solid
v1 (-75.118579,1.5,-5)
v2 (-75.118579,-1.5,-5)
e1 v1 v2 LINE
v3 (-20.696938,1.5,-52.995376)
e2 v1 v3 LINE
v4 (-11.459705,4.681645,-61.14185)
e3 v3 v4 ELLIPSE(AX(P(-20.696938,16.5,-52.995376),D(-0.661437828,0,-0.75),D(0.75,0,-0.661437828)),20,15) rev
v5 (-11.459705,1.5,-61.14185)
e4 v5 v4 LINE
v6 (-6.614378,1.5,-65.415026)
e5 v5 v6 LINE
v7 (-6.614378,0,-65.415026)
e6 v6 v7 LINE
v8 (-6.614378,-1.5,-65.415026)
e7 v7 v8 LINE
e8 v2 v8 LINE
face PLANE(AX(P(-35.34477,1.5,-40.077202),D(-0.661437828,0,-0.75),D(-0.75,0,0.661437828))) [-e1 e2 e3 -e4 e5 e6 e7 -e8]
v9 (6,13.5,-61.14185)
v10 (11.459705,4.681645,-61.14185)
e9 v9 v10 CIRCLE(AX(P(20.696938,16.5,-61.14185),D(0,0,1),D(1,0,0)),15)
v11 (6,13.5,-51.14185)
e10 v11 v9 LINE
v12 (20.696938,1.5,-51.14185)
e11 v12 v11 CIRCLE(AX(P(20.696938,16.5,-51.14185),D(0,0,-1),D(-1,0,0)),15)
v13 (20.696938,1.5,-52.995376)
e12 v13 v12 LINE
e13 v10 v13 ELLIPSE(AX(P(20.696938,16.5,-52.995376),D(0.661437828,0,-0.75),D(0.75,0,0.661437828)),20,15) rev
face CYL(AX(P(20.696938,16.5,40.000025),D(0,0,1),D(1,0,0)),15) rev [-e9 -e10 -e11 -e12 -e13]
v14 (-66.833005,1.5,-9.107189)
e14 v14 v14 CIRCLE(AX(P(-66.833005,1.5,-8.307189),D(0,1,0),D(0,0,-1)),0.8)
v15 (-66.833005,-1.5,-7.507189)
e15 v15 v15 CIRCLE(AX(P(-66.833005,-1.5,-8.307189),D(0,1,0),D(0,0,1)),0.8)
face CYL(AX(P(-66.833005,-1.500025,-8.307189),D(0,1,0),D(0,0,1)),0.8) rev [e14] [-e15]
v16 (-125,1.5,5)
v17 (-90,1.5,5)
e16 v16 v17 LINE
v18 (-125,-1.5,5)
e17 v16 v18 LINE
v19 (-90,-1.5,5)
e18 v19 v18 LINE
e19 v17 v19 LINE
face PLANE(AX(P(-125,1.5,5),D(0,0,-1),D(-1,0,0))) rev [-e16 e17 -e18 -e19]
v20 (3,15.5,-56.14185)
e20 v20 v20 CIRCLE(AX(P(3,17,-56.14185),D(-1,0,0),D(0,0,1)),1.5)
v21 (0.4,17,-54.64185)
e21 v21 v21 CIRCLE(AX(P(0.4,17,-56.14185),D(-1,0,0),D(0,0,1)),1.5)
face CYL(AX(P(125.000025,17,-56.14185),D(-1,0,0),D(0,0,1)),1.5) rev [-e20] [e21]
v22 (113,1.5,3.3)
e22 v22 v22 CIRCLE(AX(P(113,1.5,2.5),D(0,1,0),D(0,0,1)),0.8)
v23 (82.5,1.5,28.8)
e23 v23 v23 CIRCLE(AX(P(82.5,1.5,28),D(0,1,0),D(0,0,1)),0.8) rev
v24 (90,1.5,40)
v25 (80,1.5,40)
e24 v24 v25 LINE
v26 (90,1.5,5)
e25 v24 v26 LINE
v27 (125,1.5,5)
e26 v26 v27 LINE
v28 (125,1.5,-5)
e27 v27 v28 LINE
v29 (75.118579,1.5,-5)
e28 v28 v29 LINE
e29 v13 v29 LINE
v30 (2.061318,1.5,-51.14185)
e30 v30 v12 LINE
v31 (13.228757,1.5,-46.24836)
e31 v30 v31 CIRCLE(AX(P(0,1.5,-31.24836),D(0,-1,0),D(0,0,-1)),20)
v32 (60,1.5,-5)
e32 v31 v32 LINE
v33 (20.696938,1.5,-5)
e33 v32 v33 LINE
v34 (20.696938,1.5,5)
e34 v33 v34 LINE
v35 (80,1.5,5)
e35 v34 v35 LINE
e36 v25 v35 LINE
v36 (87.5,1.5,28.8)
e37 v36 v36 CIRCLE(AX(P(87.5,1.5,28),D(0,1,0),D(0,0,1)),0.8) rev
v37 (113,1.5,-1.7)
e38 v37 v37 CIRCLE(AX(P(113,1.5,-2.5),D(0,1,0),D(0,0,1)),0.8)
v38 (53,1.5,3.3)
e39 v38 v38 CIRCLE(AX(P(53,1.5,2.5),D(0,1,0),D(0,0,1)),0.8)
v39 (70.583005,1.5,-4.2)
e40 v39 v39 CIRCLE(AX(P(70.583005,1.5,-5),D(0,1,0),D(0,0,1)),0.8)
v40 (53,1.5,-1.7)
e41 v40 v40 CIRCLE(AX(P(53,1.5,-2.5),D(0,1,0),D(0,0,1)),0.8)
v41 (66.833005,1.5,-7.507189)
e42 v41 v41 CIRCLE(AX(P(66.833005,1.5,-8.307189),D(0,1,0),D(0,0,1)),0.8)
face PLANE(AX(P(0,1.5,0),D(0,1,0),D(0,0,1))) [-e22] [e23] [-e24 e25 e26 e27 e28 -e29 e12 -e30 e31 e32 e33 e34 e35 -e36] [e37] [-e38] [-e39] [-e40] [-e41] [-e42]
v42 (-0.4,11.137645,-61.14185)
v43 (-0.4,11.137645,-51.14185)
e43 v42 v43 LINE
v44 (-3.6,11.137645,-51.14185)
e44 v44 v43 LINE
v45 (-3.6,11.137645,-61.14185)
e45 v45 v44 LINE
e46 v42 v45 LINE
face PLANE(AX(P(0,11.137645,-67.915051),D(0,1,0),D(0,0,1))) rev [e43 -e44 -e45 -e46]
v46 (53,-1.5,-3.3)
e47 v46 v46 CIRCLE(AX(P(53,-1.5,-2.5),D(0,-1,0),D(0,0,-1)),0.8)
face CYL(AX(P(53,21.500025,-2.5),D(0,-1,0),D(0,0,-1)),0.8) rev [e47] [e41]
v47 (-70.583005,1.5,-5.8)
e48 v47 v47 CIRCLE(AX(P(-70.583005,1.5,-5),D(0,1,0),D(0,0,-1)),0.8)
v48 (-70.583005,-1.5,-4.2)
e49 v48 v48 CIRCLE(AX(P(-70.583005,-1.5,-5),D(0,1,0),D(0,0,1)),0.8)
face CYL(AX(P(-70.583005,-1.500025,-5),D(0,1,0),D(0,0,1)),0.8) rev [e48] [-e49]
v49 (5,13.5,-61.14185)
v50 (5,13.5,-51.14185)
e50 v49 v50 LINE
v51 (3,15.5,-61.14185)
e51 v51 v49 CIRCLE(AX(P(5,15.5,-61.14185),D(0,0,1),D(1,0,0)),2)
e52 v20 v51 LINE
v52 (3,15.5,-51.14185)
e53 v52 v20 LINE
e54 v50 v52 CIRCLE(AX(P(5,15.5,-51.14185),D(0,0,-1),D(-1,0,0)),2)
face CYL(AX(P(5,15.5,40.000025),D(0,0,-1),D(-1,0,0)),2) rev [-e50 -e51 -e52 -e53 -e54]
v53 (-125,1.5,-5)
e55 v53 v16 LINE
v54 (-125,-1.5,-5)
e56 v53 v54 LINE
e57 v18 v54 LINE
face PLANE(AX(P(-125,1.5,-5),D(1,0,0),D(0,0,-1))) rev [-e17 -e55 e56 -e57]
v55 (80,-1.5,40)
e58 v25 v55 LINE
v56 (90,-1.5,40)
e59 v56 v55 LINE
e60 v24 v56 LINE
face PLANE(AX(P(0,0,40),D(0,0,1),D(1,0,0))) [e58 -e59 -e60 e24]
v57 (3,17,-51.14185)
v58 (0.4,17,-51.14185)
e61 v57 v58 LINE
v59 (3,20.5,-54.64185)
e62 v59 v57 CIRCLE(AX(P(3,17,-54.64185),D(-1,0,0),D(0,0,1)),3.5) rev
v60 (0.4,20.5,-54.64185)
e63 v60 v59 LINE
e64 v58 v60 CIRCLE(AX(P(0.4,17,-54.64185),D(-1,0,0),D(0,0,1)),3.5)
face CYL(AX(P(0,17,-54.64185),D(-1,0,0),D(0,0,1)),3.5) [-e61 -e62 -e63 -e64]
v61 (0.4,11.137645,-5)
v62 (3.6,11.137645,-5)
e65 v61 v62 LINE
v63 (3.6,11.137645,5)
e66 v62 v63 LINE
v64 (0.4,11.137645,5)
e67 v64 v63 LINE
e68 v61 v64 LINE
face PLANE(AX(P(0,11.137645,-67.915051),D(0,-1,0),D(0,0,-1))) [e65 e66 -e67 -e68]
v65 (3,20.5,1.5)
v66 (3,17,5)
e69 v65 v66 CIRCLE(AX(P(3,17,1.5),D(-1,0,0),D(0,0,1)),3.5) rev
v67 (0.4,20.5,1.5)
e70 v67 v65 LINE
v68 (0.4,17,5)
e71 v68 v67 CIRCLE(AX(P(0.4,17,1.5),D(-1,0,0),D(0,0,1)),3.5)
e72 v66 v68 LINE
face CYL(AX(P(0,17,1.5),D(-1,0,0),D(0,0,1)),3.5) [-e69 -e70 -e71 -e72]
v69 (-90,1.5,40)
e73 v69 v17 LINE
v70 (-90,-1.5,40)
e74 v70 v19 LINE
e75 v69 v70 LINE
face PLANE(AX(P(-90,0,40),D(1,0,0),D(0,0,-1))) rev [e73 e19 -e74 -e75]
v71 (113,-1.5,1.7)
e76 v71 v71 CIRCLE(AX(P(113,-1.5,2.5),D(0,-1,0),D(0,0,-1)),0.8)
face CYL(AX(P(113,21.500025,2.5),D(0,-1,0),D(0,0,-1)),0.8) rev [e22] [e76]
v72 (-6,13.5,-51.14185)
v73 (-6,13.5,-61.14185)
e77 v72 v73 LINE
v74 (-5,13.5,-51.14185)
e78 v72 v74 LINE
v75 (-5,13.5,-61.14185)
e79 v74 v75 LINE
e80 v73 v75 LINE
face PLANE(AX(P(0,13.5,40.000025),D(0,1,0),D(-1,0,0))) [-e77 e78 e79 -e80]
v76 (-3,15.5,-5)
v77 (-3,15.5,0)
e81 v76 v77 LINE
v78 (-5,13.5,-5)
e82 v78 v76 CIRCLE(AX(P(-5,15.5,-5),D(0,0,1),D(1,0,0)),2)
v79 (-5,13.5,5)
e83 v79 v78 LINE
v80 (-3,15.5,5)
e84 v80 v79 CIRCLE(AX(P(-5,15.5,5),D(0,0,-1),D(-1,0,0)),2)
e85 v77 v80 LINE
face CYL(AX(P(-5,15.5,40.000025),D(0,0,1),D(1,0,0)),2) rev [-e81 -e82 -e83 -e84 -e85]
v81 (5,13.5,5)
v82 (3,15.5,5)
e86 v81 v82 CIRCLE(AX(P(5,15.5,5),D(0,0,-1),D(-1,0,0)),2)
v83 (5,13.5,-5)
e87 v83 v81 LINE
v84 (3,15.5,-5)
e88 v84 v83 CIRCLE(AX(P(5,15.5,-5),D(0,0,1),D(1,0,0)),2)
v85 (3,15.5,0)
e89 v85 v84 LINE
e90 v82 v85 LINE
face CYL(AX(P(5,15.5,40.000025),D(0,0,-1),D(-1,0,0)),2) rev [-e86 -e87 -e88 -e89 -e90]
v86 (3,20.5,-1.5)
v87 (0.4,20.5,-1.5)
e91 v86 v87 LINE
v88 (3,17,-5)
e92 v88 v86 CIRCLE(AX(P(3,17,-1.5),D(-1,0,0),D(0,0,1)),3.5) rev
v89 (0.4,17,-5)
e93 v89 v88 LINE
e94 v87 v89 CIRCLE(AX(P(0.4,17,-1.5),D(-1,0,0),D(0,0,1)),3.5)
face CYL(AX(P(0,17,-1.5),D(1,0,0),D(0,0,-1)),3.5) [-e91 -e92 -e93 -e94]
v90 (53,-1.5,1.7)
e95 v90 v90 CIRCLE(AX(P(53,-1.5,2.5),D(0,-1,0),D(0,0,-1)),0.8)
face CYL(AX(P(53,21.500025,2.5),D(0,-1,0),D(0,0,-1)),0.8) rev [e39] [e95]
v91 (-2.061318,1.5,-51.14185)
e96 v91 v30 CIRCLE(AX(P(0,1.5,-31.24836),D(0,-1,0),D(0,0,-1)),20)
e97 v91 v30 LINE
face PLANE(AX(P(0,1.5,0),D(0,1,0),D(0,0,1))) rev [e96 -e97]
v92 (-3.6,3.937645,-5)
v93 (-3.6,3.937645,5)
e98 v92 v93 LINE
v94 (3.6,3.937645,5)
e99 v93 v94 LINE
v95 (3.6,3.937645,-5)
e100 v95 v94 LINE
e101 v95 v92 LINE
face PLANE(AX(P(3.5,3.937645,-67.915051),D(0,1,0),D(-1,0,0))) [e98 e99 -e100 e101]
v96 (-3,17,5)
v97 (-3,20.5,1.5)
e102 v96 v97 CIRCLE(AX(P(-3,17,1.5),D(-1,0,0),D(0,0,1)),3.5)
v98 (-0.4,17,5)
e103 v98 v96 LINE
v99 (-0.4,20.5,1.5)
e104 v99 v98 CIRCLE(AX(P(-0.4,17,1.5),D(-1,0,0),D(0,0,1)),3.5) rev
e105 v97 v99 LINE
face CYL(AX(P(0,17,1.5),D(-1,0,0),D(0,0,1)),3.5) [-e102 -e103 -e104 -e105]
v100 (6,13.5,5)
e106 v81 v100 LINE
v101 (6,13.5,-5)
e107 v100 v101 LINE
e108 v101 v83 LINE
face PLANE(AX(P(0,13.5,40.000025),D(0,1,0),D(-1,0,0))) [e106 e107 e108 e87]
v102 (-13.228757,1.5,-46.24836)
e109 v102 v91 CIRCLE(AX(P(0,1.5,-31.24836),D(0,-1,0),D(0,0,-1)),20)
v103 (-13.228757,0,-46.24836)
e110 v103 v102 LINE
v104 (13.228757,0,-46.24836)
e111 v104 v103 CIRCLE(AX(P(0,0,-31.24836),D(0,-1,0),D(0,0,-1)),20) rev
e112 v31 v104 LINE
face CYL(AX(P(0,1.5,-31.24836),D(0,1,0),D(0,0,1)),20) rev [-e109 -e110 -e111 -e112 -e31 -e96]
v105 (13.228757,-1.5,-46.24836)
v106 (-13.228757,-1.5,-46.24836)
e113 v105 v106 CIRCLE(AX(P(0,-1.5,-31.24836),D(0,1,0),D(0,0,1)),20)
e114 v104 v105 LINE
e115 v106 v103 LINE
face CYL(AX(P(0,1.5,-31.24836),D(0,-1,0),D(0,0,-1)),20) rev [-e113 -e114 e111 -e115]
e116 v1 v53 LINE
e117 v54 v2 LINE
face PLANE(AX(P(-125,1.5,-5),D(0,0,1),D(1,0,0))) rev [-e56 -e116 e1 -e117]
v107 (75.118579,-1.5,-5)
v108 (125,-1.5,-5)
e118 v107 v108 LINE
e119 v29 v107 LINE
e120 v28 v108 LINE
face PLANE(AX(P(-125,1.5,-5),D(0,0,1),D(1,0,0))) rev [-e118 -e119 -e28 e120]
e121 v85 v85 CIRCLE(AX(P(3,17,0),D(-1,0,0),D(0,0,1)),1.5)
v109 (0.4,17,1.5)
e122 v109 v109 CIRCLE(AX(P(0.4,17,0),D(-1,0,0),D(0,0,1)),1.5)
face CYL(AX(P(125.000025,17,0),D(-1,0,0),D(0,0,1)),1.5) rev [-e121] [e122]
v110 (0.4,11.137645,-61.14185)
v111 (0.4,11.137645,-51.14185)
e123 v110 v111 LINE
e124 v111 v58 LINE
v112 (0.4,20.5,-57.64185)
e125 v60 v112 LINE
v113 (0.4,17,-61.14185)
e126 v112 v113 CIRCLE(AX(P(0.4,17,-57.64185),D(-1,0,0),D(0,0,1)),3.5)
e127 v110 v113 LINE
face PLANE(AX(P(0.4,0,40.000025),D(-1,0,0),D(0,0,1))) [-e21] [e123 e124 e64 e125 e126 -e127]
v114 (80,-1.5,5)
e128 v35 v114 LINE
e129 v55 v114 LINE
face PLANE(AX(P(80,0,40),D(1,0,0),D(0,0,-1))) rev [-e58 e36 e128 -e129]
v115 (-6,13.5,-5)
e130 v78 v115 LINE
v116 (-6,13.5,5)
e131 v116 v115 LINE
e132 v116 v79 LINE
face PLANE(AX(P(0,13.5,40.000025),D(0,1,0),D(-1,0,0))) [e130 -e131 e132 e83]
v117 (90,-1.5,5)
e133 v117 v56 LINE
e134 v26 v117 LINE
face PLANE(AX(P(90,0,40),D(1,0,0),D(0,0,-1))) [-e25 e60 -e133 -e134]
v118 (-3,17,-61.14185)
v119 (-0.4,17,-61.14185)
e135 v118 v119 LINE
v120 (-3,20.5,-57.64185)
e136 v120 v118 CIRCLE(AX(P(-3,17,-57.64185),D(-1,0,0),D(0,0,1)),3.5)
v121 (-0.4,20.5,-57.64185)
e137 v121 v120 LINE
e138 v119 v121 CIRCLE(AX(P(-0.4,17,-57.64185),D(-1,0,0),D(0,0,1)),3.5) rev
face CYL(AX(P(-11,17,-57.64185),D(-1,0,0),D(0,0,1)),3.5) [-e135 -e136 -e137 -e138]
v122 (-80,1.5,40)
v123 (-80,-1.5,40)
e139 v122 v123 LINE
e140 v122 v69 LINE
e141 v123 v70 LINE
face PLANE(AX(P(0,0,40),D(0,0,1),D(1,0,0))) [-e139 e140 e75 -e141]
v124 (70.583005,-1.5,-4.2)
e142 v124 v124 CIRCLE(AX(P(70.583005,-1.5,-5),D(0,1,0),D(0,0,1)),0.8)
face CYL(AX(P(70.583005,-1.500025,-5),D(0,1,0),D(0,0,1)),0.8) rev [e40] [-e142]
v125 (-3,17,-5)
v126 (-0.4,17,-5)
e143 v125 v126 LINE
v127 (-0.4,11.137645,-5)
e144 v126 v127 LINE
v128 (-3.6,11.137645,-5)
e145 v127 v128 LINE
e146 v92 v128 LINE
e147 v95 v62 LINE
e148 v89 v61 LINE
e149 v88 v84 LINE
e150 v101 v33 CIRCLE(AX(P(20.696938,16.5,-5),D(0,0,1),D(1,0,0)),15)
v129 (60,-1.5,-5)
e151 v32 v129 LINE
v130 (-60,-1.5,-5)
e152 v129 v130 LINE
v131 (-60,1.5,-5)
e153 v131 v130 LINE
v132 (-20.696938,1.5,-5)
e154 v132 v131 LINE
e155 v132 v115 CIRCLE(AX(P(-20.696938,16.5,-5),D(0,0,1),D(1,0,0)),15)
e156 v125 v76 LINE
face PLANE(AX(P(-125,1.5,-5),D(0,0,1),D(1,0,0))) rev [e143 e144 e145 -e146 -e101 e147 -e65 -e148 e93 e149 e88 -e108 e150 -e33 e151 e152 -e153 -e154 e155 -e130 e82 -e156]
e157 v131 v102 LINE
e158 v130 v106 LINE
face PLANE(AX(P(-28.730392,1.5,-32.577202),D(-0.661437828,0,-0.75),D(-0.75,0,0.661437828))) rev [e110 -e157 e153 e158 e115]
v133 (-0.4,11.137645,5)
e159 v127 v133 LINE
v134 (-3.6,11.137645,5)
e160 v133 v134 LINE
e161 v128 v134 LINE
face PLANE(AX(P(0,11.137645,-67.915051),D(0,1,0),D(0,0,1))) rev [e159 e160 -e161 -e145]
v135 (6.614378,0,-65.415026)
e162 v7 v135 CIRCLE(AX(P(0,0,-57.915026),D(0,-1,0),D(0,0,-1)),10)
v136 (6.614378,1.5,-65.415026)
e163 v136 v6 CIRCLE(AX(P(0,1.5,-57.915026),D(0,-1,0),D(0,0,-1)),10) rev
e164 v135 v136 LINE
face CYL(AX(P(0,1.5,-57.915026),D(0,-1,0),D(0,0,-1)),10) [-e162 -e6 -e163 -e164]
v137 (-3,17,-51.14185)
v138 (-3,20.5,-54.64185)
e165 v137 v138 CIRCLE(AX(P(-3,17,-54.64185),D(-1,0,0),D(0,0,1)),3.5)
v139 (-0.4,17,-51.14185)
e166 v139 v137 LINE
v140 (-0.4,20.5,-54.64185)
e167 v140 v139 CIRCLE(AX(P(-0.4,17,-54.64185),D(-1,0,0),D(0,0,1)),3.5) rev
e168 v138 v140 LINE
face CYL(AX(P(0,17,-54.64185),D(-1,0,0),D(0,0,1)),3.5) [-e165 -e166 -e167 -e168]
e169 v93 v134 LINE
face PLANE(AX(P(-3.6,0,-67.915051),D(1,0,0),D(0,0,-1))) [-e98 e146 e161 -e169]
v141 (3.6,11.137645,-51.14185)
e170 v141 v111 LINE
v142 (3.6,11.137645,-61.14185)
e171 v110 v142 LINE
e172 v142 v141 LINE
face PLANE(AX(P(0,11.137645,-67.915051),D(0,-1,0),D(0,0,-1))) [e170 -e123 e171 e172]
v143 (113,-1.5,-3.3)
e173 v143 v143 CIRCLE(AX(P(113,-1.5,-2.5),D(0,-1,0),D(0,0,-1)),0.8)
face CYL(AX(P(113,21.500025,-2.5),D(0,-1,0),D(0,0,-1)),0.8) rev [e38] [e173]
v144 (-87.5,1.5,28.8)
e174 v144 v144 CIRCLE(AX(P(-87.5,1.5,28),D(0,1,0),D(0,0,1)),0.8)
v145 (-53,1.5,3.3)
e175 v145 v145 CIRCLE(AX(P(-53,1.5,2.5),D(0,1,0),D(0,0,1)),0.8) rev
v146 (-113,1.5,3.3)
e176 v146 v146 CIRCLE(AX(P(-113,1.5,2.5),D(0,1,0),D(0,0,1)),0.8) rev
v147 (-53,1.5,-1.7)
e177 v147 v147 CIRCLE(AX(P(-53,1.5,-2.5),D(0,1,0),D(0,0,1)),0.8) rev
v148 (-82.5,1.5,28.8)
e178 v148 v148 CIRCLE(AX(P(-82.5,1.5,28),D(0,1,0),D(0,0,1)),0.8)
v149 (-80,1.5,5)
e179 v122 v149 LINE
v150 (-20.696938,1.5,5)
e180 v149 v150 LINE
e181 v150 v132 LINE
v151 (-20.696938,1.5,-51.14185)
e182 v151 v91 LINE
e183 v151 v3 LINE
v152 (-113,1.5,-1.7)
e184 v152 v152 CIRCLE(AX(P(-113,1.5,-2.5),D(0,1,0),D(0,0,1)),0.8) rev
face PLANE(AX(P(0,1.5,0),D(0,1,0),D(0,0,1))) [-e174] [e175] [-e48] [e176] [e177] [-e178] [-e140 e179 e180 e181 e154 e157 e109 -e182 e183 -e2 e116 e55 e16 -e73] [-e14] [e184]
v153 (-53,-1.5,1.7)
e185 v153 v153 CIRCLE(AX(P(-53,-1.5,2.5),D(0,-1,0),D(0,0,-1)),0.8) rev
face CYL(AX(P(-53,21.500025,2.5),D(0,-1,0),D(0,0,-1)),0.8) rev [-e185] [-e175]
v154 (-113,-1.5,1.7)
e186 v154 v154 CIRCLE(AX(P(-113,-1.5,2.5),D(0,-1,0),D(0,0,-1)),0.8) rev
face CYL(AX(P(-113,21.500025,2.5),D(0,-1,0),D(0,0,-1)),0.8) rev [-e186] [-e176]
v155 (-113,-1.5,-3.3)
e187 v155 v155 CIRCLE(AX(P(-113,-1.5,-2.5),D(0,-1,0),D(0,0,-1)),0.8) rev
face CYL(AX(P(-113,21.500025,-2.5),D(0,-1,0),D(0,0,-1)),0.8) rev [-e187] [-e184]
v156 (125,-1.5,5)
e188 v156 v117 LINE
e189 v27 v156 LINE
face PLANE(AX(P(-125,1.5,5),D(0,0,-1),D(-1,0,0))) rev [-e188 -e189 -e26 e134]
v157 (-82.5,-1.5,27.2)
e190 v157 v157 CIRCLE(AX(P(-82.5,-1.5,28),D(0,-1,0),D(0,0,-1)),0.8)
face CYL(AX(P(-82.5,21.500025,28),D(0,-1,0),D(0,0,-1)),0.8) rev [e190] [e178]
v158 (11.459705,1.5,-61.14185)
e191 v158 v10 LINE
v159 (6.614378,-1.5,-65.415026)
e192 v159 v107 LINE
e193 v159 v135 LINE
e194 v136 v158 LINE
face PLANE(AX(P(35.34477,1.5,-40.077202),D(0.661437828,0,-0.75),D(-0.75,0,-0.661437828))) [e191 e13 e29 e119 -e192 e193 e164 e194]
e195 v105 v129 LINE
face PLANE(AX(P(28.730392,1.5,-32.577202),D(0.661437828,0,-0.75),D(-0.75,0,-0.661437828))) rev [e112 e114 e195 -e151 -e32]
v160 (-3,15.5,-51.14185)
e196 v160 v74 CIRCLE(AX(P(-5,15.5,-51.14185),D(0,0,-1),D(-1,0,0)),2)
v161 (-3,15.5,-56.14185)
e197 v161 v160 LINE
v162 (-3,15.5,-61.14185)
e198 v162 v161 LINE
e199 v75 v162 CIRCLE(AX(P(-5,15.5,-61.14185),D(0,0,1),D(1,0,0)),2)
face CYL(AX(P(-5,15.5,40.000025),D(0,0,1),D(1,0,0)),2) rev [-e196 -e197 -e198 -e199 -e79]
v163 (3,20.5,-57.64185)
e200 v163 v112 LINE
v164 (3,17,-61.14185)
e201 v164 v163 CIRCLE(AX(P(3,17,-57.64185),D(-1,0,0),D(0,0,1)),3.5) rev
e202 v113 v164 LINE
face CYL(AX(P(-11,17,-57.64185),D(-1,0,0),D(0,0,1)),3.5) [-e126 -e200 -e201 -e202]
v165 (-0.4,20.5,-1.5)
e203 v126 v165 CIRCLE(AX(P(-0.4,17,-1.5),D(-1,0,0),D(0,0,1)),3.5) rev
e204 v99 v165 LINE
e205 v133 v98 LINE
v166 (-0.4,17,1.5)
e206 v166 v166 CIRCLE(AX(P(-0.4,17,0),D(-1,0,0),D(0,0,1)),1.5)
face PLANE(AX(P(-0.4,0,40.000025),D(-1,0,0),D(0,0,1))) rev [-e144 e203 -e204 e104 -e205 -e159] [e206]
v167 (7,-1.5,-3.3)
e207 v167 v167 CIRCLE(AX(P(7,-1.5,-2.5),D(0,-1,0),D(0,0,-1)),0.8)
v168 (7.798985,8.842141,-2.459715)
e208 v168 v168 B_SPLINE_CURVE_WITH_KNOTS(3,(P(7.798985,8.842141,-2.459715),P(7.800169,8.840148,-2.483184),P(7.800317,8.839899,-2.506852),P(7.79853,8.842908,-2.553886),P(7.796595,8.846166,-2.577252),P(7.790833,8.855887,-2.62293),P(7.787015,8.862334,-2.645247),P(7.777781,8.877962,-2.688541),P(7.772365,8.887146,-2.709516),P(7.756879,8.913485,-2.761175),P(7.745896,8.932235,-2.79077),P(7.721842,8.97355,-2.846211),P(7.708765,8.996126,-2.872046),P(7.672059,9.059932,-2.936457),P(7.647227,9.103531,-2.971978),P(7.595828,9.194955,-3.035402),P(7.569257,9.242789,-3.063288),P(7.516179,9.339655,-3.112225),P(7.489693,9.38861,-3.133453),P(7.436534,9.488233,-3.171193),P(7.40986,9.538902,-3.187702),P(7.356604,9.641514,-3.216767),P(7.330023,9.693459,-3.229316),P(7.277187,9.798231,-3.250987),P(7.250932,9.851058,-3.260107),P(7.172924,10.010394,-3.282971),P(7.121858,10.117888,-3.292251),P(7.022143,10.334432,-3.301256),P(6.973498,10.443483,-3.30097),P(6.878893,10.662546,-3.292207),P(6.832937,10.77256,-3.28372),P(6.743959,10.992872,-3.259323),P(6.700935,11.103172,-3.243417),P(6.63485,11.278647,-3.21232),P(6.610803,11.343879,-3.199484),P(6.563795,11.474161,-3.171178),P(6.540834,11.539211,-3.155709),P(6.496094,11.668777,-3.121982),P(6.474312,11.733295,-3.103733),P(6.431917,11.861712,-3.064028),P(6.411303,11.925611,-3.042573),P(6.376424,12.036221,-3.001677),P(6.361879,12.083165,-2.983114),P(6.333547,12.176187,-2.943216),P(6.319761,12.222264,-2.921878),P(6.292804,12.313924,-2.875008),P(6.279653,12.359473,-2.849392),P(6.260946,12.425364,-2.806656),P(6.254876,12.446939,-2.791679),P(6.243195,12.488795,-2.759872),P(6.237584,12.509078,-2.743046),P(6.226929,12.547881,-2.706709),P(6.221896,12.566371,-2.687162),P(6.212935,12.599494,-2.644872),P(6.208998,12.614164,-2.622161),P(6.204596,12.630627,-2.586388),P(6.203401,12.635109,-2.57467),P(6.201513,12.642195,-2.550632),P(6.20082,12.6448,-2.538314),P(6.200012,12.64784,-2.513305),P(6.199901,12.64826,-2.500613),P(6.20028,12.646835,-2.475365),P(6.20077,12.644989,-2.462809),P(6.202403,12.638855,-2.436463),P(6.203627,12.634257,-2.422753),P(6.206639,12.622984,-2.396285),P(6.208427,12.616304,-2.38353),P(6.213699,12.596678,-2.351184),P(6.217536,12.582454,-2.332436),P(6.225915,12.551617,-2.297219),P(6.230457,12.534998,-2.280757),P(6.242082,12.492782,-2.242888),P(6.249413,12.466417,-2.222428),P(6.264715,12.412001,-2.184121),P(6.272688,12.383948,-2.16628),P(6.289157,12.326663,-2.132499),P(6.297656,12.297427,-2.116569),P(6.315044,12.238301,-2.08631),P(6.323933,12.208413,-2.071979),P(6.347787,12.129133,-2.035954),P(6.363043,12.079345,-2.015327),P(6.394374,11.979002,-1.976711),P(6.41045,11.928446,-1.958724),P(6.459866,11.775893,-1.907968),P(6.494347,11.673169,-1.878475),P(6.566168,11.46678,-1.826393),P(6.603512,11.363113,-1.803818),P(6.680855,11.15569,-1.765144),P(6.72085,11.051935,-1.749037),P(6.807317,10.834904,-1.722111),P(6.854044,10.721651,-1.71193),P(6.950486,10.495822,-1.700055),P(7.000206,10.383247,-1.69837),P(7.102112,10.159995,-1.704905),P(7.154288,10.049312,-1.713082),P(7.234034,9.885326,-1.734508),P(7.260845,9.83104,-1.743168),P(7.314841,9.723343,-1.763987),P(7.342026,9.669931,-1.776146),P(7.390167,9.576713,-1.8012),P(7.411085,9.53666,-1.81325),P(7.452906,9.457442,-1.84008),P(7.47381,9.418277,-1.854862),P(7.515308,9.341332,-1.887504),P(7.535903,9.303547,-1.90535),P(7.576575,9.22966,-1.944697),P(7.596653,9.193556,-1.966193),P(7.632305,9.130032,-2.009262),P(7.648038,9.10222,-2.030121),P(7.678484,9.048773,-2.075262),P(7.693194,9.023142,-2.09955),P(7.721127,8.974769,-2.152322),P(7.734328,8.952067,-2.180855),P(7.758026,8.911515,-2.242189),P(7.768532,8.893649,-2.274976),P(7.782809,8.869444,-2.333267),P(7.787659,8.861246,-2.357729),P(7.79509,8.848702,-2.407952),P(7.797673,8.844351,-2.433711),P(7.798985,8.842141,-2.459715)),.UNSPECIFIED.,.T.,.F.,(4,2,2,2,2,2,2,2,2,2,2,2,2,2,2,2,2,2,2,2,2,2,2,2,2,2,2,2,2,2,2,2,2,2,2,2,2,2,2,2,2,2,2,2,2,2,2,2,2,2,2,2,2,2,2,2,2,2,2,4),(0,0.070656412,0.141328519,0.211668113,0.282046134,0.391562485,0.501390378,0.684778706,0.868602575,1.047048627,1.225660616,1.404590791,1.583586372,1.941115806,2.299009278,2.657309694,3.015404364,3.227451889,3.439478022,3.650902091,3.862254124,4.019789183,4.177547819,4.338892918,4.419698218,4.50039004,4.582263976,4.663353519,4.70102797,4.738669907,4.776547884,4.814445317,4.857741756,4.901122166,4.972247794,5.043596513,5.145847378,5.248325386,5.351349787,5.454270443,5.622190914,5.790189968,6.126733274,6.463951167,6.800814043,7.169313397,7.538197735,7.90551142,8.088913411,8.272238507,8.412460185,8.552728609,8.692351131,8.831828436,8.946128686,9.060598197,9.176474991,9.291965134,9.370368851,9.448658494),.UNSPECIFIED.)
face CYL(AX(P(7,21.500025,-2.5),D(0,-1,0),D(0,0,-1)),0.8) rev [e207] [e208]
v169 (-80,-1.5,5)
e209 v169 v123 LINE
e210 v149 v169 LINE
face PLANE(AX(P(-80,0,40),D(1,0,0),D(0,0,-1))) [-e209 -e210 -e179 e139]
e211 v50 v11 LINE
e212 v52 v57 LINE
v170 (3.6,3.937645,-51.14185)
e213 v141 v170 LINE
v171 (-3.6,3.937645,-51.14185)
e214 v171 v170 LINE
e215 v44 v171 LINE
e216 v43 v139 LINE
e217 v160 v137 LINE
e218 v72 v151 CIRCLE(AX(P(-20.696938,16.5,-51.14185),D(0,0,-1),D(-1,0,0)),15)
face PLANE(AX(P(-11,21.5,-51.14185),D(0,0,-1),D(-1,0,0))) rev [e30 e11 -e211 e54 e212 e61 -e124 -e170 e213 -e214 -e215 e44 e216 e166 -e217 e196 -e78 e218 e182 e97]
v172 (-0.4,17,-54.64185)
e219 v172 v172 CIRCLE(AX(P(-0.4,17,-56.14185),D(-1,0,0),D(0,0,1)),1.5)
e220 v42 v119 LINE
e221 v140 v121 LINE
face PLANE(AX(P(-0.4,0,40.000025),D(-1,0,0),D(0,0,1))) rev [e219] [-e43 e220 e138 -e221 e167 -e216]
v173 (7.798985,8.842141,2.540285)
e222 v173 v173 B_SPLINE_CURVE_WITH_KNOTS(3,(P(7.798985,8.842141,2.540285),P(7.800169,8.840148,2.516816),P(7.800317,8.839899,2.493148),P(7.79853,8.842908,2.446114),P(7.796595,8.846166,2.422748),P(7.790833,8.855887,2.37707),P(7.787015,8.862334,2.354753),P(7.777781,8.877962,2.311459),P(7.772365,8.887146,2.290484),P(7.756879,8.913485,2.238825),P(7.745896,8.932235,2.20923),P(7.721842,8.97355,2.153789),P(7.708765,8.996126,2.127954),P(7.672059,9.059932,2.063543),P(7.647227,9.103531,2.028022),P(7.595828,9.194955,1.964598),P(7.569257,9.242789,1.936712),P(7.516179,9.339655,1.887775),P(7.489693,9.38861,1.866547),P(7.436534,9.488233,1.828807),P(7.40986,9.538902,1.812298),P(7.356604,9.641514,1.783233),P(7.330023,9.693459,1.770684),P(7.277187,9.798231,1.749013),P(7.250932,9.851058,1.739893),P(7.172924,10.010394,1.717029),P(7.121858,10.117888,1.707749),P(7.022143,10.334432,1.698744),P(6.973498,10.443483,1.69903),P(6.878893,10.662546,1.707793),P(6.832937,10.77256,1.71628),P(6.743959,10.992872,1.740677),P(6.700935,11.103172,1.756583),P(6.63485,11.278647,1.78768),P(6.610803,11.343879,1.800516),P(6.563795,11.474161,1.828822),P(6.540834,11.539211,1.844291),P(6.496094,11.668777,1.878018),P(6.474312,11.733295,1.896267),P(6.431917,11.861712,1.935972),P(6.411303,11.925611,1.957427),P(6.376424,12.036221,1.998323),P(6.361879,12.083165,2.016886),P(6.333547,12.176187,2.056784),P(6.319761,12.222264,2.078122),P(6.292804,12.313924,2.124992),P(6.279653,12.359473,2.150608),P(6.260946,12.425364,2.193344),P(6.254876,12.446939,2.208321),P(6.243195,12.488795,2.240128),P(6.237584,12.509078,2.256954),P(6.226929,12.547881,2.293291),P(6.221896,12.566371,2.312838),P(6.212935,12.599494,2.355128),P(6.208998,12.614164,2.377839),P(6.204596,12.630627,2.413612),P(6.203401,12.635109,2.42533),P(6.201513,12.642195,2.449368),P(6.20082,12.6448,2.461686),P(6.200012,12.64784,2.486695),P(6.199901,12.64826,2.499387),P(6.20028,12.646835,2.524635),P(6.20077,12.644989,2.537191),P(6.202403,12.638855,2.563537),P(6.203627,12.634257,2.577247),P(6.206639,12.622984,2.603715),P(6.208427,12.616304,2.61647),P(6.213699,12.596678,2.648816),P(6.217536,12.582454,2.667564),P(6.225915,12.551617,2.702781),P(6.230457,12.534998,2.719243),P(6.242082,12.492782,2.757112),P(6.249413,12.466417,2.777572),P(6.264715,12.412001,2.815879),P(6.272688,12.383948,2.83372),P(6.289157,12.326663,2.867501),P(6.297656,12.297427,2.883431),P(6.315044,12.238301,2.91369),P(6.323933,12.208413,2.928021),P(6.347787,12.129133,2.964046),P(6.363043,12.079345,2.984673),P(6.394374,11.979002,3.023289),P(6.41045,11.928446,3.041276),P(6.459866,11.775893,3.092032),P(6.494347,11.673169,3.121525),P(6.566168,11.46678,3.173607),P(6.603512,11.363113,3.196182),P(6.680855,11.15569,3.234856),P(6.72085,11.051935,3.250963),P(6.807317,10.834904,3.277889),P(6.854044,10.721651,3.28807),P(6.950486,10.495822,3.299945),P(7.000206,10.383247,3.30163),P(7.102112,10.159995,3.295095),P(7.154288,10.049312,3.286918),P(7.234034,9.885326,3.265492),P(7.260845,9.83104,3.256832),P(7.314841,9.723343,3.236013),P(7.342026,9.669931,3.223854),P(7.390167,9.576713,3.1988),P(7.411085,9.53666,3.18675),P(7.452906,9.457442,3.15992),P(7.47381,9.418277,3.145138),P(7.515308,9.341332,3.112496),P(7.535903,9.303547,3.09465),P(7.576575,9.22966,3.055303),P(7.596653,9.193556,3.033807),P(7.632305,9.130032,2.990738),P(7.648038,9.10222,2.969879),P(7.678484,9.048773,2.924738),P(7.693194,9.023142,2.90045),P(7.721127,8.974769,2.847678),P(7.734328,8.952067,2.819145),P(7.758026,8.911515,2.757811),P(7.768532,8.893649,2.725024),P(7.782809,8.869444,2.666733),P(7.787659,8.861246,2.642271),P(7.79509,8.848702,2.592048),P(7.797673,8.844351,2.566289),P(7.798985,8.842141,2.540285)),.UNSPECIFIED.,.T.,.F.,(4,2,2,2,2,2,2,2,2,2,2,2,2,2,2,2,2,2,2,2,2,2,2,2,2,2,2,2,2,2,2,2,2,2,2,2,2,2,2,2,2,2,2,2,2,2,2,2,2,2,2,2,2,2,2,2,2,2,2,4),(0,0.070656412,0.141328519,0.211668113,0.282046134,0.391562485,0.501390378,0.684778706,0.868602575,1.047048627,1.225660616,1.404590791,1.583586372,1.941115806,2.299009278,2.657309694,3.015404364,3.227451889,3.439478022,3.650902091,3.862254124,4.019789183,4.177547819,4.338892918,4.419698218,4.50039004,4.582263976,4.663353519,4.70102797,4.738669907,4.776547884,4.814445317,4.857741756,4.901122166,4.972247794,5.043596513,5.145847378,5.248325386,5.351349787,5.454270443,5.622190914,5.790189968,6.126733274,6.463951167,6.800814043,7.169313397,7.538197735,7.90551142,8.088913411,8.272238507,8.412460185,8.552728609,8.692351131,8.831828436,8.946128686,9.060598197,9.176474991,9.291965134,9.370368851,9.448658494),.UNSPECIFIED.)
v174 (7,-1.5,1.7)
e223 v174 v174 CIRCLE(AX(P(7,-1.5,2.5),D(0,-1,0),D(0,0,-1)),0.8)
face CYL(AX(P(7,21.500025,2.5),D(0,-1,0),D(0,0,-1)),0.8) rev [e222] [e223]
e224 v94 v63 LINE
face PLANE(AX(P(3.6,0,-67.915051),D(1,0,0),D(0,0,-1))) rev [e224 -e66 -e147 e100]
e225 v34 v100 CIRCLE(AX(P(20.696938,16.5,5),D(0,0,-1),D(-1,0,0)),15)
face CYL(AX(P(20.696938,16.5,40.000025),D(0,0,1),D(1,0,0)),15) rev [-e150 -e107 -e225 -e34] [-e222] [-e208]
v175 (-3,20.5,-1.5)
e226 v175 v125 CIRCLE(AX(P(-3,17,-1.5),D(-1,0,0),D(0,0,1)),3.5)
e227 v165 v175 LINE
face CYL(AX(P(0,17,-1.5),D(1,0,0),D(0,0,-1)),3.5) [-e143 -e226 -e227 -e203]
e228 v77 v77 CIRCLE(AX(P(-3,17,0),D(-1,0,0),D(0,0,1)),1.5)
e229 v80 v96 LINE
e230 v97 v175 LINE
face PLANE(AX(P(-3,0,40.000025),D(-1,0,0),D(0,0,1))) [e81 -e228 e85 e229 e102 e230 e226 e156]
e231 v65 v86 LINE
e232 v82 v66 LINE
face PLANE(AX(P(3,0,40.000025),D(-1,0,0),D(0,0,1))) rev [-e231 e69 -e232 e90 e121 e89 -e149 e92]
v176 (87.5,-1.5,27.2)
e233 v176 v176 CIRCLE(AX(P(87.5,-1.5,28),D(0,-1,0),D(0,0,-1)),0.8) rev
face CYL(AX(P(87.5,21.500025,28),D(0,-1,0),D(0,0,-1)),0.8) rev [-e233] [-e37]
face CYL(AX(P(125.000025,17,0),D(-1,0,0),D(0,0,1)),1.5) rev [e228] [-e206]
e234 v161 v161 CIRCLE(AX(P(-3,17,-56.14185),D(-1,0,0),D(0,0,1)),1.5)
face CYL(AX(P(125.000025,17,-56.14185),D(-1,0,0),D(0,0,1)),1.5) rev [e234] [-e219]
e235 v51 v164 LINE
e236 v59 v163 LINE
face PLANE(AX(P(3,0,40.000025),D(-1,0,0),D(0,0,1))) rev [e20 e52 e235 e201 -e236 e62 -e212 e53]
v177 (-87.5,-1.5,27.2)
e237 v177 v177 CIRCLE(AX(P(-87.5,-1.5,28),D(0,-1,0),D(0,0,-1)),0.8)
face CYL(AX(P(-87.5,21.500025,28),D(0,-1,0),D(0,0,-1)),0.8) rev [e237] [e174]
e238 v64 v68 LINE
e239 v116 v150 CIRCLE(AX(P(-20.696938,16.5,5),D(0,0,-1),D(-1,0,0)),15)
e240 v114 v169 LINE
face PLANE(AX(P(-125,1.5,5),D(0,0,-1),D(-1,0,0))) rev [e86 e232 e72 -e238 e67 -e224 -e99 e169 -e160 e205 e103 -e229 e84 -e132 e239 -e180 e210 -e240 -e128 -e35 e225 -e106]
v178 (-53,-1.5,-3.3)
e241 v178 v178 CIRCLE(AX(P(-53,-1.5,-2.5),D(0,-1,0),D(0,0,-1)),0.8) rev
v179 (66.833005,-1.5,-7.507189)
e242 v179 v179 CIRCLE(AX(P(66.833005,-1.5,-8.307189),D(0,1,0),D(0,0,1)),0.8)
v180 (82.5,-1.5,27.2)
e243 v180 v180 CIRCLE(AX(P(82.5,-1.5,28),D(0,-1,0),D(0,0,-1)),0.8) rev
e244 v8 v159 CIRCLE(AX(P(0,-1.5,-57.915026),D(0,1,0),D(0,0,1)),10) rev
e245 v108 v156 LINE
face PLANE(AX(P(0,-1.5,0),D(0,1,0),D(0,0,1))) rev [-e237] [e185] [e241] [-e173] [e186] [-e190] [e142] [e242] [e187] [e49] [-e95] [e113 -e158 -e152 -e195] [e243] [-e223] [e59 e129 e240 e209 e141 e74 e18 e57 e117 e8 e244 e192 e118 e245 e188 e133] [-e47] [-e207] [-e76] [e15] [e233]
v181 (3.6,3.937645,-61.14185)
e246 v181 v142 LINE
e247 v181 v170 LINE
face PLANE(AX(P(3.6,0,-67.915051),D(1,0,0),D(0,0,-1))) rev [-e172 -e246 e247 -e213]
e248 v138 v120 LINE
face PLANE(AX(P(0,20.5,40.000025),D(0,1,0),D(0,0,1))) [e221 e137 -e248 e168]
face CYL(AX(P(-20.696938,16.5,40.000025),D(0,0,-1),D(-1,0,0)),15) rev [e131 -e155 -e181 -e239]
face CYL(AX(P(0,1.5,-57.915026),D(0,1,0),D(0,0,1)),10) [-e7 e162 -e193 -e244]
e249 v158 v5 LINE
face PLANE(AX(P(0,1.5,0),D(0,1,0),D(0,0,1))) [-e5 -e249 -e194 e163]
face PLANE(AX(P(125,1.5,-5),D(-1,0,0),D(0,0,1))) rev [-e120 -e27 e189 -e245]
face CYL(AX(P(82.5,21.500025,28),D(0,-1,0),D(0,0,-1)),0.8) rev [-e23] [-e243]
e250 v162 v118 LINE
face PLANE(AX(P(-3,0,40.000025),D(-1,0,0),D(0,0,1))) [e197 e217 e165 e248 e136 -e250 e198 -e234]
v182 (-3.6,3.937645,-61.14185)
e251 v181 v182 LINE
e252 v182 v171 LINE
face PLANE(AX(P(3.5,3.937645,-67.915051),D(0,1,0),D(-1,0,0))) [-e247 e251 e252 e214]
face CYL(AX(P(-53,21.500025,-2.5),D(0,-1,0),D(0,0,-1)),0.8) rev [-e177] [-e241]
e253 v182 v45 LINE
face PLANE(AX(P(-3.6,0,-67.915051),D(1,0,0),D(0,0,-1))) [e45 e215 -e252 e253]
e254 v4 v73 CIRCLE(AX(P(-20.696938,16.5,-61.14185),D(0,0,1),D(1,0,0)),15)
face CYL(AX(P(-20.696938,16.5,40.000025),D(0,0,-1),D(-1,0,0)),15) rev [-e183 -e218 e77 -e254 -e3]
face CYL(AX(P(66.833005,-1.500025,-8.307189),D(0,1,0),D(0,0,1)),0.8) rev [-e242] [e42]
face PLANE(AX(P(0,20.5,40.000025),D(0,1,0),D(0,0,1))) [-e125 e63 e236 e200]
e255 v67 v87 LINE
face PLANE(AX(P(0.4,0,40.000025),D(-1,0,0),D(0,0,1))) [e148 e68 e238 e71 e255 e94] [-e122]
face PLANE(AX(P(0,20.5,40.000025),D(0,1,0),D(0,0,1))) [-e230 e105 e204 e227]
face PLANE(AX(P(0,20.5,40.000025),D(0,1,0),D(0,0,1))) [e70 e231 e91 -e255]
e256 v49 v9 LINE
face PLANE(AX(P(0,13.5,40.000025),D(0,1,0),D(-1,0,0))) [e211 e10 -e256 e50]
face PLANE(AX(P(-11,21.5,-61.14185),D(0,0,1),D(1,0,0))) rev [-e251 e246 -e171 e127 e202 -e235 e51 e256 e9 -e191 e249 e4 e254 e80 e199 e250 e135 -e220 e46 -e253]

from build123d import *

# Parameters (mm, degrees)
EXTRUDE_1_DEPTH      = 1.5
EXTRUDE_10_DEPTH     = 1.5
FILLET_1_R           = 10
FILLET_2_R           = 20
EXTRUDE_11_DEPTH     = 20
EXTRUDE_13_DEPTH     = 35
EXTRUDE_14_DEPTH     = 35
EXTRUDE_15_DEPTH     = 1.5
FILLET_5_R           = 20
FILLET_6_R           = 10
SKETCH_58_R          = 0.8000000000000042
SKETCH_58_R_2        = 0.8000000000000055
SKETCH_58_R_3        = 0.8000000000000044
SKETCH_58_R_4        = 0.7999999999999963
SKETCH_58_R_5        = 0.8000000000000119
SKETCH_58_R_6        = 0.7999999999999946
SKETCH_58_R_7        = 0.7999999999999954
SKETCH_58_R_8        = 0.7999999999999948
SKETCH_58_R_9        = 0.8000000000000026
CUT_EXTRUDE_52_DEPTH = 145.10569310974057
SKETCH_26_W          = 22
SKETCH_26_H          = 10
EXTRUDE_16_DEPTH     = 20
CUT_EXTRUDE_53_DEPTH = 163.22491745731594
FILLET_7_R           = 15
FILLET_8_R           = 15
FILLET_9_R           = 3.5
SKETCH_60_R          = 1.5000000000000042
CUT_EXTRUDE_54_DEPTH = 147.3444593643323
SKETCH_61_R          = 1.5000000000000004
CUT_EXTRUDE_55_DEPTH = 147.3444593643323
FILLET_10_R          = 2
SKETCH_63_R          = 0.7999999999999954
CUT_EXTRUDE_56_DEPTH = 144.52160390212592
CUT_EXTRUDE_57_DEPTH = 147.15693979025303


# Some blends are built 0.0001 mm under size
with BuildPart() as part:
    # 草图1 → 凸台-拉伸1 (new body)
    with BuildSketch(Plane(origin=(0, 0, 0), x_dir=(1, 0, 0), z_dir=(0, 1, 0))):
        Polygon((-125, 4.999999999999984), (124.99999999999996, 4.999999999999984), (124.99999999999996, -5.0000000000000115), (-125.00000000000003, -5.0000000000000115), align=None)
    extrude(amount=EXTRUDE_1_DEPTH)



with BuildPart() as body_2:
    # 草图22 → 凸台-拉伸10 (new body)
    with BuildSketch(Plane.XZ):
        Polygon((-3.09e-14, -71.24835955462486), (-3.362e-14, -57.91502622129154), (-60.00000000000021, -4.9999999999999805), (-75.11857892036937, -4.9999999999999805), align=None)
        Polygon((60.00000000000021, -4.9999999999999645), (1.388e-14, -57.91502622129154), (-3.09e-14, -71.24835955462486), (75.1185789203694, -4.999999999999957), align=None)
    extrude(amount=-EXTRUDE_10_DEPTH)

    # 圆角1
    fillet_1_edges = [body_2.edges().sort_by_distance(p)[0] for p in [
        (-8.35e-15, 0.75, -71.24835955462484),
    ]]
    fillet(fillet_1_edges, radius=FILLET_1_R)

    # 圆角2
    fillet_2_edges = [body_2.edges().sort_by_distance(p)[0] for p in [
        (-9.71e-15, 0.75, -57.91502622129154),
    ]]
    fillet(fillet_2_edges, radius=FILLET_2_R)


with BuildPart() as part_1:
    add(part.part)

    add(body_2.part)  # 凸台-拉伸11 merges body 2
    # 草图24 → 凸台-拉伸11 (add)
    with BuildSketch(Plane(origin=(0, 1.5, 0), x_dir=(1, 0, 0), z_dir=(0, 1, 0))):
        Polygon((-10.000000000000004, 4.999999999999999), (9.999999999999996, 4.999999999999999), (9.999999999999996, -5.000000000000001), (-10.000000000000002, -5.000000000000001), align=None)
    extrude(amount=EXTRUDE_11_DEPTH)

    # 草图41 → 凸台-拉伸13 (add)
    with BuildSketch(Plane.XY.offset(5.0000000000000115)):
        Polygon((89.99999999999996, 1.4999999999999951), (79.99999999999996, 1.4999999999999951), (79.99999999999996, -4.88e-15), (89.99999999999996, -4.99e-15), (89.99999999999996, 0.7499999999999958), align=None)
    extrude(amount=EXTRUDE_13_DEPTH)

    # 草图42 → 凸台-拉伸14 (add)
    with BuildSketch(Plane.XY.offset(5.0000000000000115)):
        Polygon((-80, 1.4999999999999998), (-90, 1.4999999999999998), (-90, 0.75), (-90, -2.2e-16), (-80, -2.2e-16), align=None)
    extrude(amount=EXTRUDE_14_DEPTH)

    # 草图57 → 凸台-拉伸15 (add)
    with BuildSketch(Plane(origin=(0, 0, 0), x_dir=(-1, 0, 0), z_dir=(0, -1, 0))):
        Polygon((125.00000000000003, -5.0000000000000115), (90, -5.0000000000000115), (90, -40.000000000000014), (80, -40.000000000000014), (80, -5.0000000000000115), (-79.99999999999996, -5.0000000000000115), (-79.99999999999996, -40.000000000000014), (-89.99999999999996, -40.000000000000014), (-89.99999999999994, -5.0000000000000115), (-124.99999999999996, -5.0000000000000115), (-124.99999999999996, 4.999999999999984), (-75.11857892036936, 4.999999999999984), (-6.614378277661482, 65.41502622129155), (-3.024e-14, 71.24835955462483), (6.614378277661415, 65.41502622129157), (75.11857892036936, 4.999999999999984), (125, 4.999999999999984), align=None)
        Polygon((60.00000000000022, 4.999999999999984), (-60.00000000000011, 4.999999999999984), (-2.082e-14, 57.915026221291534), align=None, mode=Mode.SUBTRACT)
    extrude(amount=EXTRUDE_15_DEPTH)

    # 圆角5
    fillet_5_edges = [part_1.edges().sort_by_distance(p)[0] for p in [
        (2.082e-14, -0.75, -57.915026221291534),
    ]]
    fillet(fillet_5_edges, radius=FILLET_5_R)

    # 圆角6
    fillet_6_edges = [part_1.edges().sort_by_distance(p)[0] for p in [
        (3.024e-14, -0.75, -71.24835955462483),
    ]]
    fillet(fillet_6_edges, radius=FILLET_6_R)

    # 草图58 → 切除-拉伸52 (cut, through all)
    with BuildSketch(Plane.XZ.offset(1.5)):
        with Locations(Location((7, 2.499999999999986, 0), (0, 0, 270))):
            Circle(SKETCH_58_R)
        with Locations(Location((6.999999999999998, -2.5000000000000147, 0), (0, 0, 270))):
            Circle(SKETCH_58_R_2)
        with Locations(Location((53, 2.5000000000000027, 0), (0, 0, 270))):
            Circle(SKETCH_58_R_3)
        with Locations(Location((53.000000000000014, -2.5000000000000027, 0), (0, 0, 270))):
            Circle(SKETCH_58_R_4)
        with Locations(Location((112.99999999999994, 2.5000000000000138, 0), (0, 0, 270))):
            Circle(SKETCH_58_R_5)
        with Locations(Location((112.99999999999997, -2.500000000000007, 0), (0, 0, 270))):
            Circle(SKETCH_58_R_6)
        with Locations(Location((-87.5, 28.000000000000014, 0), (0, 0, 270))):
            Circle(SKETCH_58_R_7)
        with Locations(Location((-82.49999999999999, 28.000000000000007, 0), (0, 0, 270))):
            Circle(SKETCH_58_R_8)
        with Locations(Location((-112.99999999999996, -2.5, 0), (0, 0, 270))):
            Circle(SKETCH_58_R_7)
        with Locations(Location((-112.99999999999996, 2.4999999999999987, 0), (0, 0, 270))):
            Circle(SKETCH_58_R_7)
        with Locations(Location((-53, -2.5, 0), (0, 0, 270))):
            Circle(SKETCH_58_R_9)
        with Locations(Location((-53, 2.5, 0), (0, 0, 270))):
            Circle(SKETCH_58_R_9)
        with Locations(Location((82.49999999999999, 28.000000000000036, 0), (0, 0, 270))):
            Circle(SKETCH_58_R_7)
        with Locations(Location((87.5, 28.000000000000036, 0), (0, 0, 270))):
            Circle(SKETCH_58_R_7)
    extrude(amount=-CUT_EXTRUDE_52_DEPTH, mode=Mode.SUBTRACT)

    # 草图26 → 凸台-拉伸16 (add)
    with BuildSketch(Plane(origin=(0, 1.5, 0), x_dir=(1, 0, 0), z_dir=(0, 1, 0))):
        with Locations((-1.78e-15, 56.141850111775966)):
            Rectangle(SKETCH_26_W, SKETCH_26_H)
    extrude(amount=EXTRUDE_16_DEPTH)

    # 草图59 → 切除-拉伸53 (cut, through all)
    with BuildSketch(Plane(origin=(1.928e-14, 0, -61.14185011177596), x_dir=(-1, 0, -3.2e-16), z_dir=(3.2e-16, 0, -1))):
        Polygon((5.999999999999998, 13.5), (5.999999999999998, 1.5), (11.000000000000021, 1.5), (11.00000000000002, 21.5), (-10.99999999999998, 21.5), (-10.999999999999979, 1.5), (-6, 1.5), (-6.000000000000002, 13.499999999999996), (-3.0000000000000018, 13.499999999999996), (-3.0000000000000018, 20.499999999999996), (-0.40000000000000174, 20.499999999999996), (-1.73e-15, 20.499999999999996), (0.3999999999999983, 20.499999999999996), (2.9999999999999982, 20.499999999999996), (2.9999999999999982, 13.499999999999996), align=None)
        Polygon((-3.5000000000000013, 4.037645071572423), (-1.78e-15, 4.037645071572423), (3.4999999999999982, 4.037645071572423), (3.4999999999999982, 11.037645071572424), (0.927810105733712, 11.037645071572424), (0.3999999999999977, 11.037645071572424), (-1.78e-15, 11.037645071572424), (-0.4000000000000017, 11.037645071572422), (-3.5000000000000018, 11.037645071572422), align=None)
        Polygon((-0.4000000000000018, 13.499999999999996), (-0.4000000000000018, 11.037645071572424), (-1.78e-15, 11.037645071572424), (0.3999999999999977, 11.037645071572424), (0.3999999999999976, 13.499999999999996), (-1.78e-15, 13.499999999999998), align=None)
        Polygon((-0.40000000000000174, 20.499999999999996), (-0.4000000000000018, 13.499999999999996), (-1.78e-15, 13.499999999999998), (-1.73e-15, 20.499999999999996), align=None)
        Polygon((-1.78e-15, 13.499999999999998), (0.3999999999999977, 13.499999999999998), (0.3999999999999983, 20.499999999999996), (-1.73e-15, 20.499999999999996), align=None)
    extrude(amount=-CUT_EXTRUDE_53_DEPTH, mode=Mode.SUBTRACT)

    # 圆角7
    # the kernel refuses this fillet: 15 mm, written as the material it adds along each edge
    with BuildSketch(Plane(origin=(6.0000000000000195, 1.5, -61.14185011177596), x_dir=(1, 0, 3.2e-16), z_dir=(-3.2e-16, 0, 1))) as fillet_7_piece_1_section:
        with BuildLine():
            CenterArc((14.696938456699067, 15), FILLET_7_R, 191.5369590328155, 78.4630409671845)
            Line((1.78e-15, 11.999999999999996), (0, 0))
            Line((0, 0), (14.696938456699067, 0))
        make_face()
    fillet_7_piece_1 = extrude(amount=9.999999999999993, mode=Mode.PRIVATE)
    fillet_7_piece_1 = split(fillet_7_piece_1, bisect_by=Plane(origin=(8.388620739132056, 1.5, -63.85029144843083), z_dir=(-0.6614378277661448, 0, 0.7500000000000027)), keep=Keep.TOP, mode=Mode.PRIVATE)
    add(fillet_7_piece_1)
    with BuildSketch(Plane(origin=(-5.99999999999998, 1.5, -61.14185011177596), x_dir=(-1, 0, -3.2e-16), z_dir=(-3.2e-16, 0, 1))) as fillet_7_piece_2_section:
        with BuildLine():
            CenterArc((14.696938456699073, -15), FILLET_7_R, 90, 78.46304096718453)
            Line((8.9e-16, -12), (0, 0))
            Line((0, 0), (14.696938456699073, 0))
        make_face()
    fillet_7_piece_2 = extrude(amount=9.999999999999993, mode=Mode.PRIVATE)
    fillet_7_piece_2 = split(fillet_7_piece_2, bisect_by=Plane(origin=(-8.388620739132019, 1.5, -63.85029144843084), z_dir=(0.6614378277661446, 0, 0.7500000000000028)), keep=Keep.TOP, mode=Mode.PRIVATE)
    add(fillet_7_piece_2)

    # 圆角8
    # the kernel refuses this fillet: 15 mm, written as the material it adds along each edge
    with BuildSketch(Plane(origin=(6.000000000000002, 1.5, -4.999999999999986), x_dir=(1, 0, 3.2e-16), z_dir=(-3.2e-16, 0, 1))) as fillet_8_piece_1_section:
        with BuildLine():
            CenterArc((14.69693845669907, 15), FILLET_8_R, 191.5369590328155, 78.4630409671845)
            Line((1.78e-15, 11.999999999999996), (0, 0))
            Line((0, 0), (14.69693845669907, 0))
        make_face()
    fillet_8_piece_1 = extrude(amount=9.999999999999993, mode=Mode.PRIVATE)
    fillet_8_piece_1 = fillet_8_piece_1 - Plane(origin=(6.999999999999998, 1.5, -2.5000000000000147), x_dir=(-1.8e-16, 0, -1), z_dir=(0, -1, 0)) * Cylinder(0.8000000000000055, 79, mode=Mode.PRIVATE)
    fillet_8_piece_1 = fillet_8_piece_1 - Plane(origin=(7, 1.5, 2.499999999999986), x_dir=(-1.8e-16, 0, -1), z_dir=(0, -1, 0)) * Cylinder(0.8000000000000042, 79, mode=Mode.PRIVATE)
    add(fillet_8_piece_1)
    with BuildSketch(Plane(origin=(-5.999999999999997, 1.5, -4.999999999999986), x_dir=(-1, 0, -3.2e-16), z_dir=(-3.2e-16, 0, 1))) as fillet_8_piece_2:
        with BuildLine():
            CenterArc((14.696938456699069, -15), FILLET_8_R, 90, 78.4630409671845)
            Line((8.9e-16, -12), (0, 0))
            Line((0, 0), (14.696938456699069, 0))
        make_face()
    extrude(amount=9.999999999999993)

    # 圆角9
    fillet_9_edges = [part_1.edges().sort_by_distance(p)[0] for p in [
        (-1.6999999999999824, 20.499999999999996, -51.141850111775966),
        (1.700000000000018, 20.499999999999996, -51.141850111775966),
        (1.7000000000000028, 20.499999999999996, 5.000000000000009),
        (1.700000000000021, 20.499999999999996, -61.14185011177596),
        (-1.7000000000000028, 20.499999999999996, 5.000000000000009),
        (-1.699999999999979, 20.499999999999996, -61.14185011177596),
        (1.70000000000001, 20.499999999999996, -4.999999999999985),
        (-1.6999999999999957, 20.499999999999996, -4.999999999999985),
    ]]
    fillet(fillet_9_edges, radius=FILLET_9_R)

    # 草图60 → 切除-拉伸54 (cut, through all)
    with BuildSketch(Plane.ZY.offset(2.9999999999999987)):
        with Locations((-56.14185011177597, 16.999999999999996)):
            Circle(SKETCH_60_R)
    extrude(amount=-CUT_EXTRUDE_54_DEPTH, mode=Mode.SUBTRACT)

    # 草图61 → 切除-拉伸55 (cut, through all)
    with BuildSketch(Plane.ZY.offset(2.9999999999999987)):
        with Locations((4.3e-16, 16.999999999999996)):
            Circle(SKETCH_61_R)
    extrude(amount=-CUT_EXTRUDE_55_DEPTH, mode=Mode.SUBTRACT)

    # 圆角10
    fillet_10_edges = [part_1.edges().sort_by_distance(p)[0] for p in [
        (3.0000000000000018, 13.499999999999996, 7.11e-15),
        (3.000000000000019, 13.499999999999996, -56.141850111775966),
        (-2.9999999999999982, 13.499999999999998, 7.11e-15),
        (-2.999999999999981, 13.499999999999998, -56.141850111775966),
    ]]
    fillet(fillet_10_edges, radius=FILLET_10_R - 0.0001)  # a hair under: the kernel refuses the full size

    # 草图63 → 切除-拉伸56 (cut, through all)
    with BuildSketch(Plane(origin=(0, 1.5, 0), x_dir=(1, 0, 0), z_dir=(0, 1, 0))):
        with Locations(Location((70.5830052442586, 4.999999999999985, 0), (0, 0, 270))):
            Circle(SKETCH_63_R)
        with Locations(Location((66.83300524425859, 8.307189138830706, 0), (0, 0, 270))):
            Circle(SKETCH_63_R)
        with Locations(Location((-66.83300524425859, 8.307189138830706, 0), (0, 0, 270))):
            Circle(SKETCH_63_R)
        with Locations(Location((-70.5830052442586, 4.999999999999985, 0), (0, 0, 270))):
            Circle(SKETCH_63_R)
    extrude(amount=-CUT_EXTRUDE_56_DEPTH, mode=Mode.SUBTRACT)

    # 草图64 → 切除-拉伸57 (cut, through all)
    with BuildSketch(Plane.XY.offset(5.0000000000000115)):
        Polygon((-3.5000000000000004, 11.037645071572424), (3.4999999999999996, 11.037645071572424), (3.599999999999999, 11.037645071572424), (3.599999999999999, 11.137645071572424), (-3.5000000000000004, 11.137645071572424), align=None)
        Polygon((3.599999999999999, 11.037645071572424), (3.4999999999999996, 11.037645071572424), (3.5000000000000004, 4.037645071572423), (3.5000000000000004, 3.9376450715724243), (3.6, 3.9376450715724243), align=None)
        Polygon((3.5000000000000004, 4.037645071572423), (3.4999999999999996, 11.037645071572424), (-3.5000000000000004, 11.037645071572424), (-3.5000000000000004, 4.037645071572423), align=None)
        Polygon((3.5000000000000004, 3.9376450715724243), (3.5000000000000004, 4.037645071572423), (-3.500000000000001, 4.037645071572422), (-3.6000000000000005, 4.037645071572422), (-3.6000000000000005, 3.9376450715724234), align=None)
        Polygon((-3.5000000000000004, 4.037645071572423), (-3.5000000000000004, 11.037645071572424), (-3.5000000000000004, 11.137645071572424), (-3.6000000000000005, 11.137645071572424), (-3.6000000000000005, 4.037645071572422), align=None)
    extrude(amount=-CUT_EXTRUDE_57_DEPTH, mode=Mode.SUBTRACT)


solid = part_1.part
